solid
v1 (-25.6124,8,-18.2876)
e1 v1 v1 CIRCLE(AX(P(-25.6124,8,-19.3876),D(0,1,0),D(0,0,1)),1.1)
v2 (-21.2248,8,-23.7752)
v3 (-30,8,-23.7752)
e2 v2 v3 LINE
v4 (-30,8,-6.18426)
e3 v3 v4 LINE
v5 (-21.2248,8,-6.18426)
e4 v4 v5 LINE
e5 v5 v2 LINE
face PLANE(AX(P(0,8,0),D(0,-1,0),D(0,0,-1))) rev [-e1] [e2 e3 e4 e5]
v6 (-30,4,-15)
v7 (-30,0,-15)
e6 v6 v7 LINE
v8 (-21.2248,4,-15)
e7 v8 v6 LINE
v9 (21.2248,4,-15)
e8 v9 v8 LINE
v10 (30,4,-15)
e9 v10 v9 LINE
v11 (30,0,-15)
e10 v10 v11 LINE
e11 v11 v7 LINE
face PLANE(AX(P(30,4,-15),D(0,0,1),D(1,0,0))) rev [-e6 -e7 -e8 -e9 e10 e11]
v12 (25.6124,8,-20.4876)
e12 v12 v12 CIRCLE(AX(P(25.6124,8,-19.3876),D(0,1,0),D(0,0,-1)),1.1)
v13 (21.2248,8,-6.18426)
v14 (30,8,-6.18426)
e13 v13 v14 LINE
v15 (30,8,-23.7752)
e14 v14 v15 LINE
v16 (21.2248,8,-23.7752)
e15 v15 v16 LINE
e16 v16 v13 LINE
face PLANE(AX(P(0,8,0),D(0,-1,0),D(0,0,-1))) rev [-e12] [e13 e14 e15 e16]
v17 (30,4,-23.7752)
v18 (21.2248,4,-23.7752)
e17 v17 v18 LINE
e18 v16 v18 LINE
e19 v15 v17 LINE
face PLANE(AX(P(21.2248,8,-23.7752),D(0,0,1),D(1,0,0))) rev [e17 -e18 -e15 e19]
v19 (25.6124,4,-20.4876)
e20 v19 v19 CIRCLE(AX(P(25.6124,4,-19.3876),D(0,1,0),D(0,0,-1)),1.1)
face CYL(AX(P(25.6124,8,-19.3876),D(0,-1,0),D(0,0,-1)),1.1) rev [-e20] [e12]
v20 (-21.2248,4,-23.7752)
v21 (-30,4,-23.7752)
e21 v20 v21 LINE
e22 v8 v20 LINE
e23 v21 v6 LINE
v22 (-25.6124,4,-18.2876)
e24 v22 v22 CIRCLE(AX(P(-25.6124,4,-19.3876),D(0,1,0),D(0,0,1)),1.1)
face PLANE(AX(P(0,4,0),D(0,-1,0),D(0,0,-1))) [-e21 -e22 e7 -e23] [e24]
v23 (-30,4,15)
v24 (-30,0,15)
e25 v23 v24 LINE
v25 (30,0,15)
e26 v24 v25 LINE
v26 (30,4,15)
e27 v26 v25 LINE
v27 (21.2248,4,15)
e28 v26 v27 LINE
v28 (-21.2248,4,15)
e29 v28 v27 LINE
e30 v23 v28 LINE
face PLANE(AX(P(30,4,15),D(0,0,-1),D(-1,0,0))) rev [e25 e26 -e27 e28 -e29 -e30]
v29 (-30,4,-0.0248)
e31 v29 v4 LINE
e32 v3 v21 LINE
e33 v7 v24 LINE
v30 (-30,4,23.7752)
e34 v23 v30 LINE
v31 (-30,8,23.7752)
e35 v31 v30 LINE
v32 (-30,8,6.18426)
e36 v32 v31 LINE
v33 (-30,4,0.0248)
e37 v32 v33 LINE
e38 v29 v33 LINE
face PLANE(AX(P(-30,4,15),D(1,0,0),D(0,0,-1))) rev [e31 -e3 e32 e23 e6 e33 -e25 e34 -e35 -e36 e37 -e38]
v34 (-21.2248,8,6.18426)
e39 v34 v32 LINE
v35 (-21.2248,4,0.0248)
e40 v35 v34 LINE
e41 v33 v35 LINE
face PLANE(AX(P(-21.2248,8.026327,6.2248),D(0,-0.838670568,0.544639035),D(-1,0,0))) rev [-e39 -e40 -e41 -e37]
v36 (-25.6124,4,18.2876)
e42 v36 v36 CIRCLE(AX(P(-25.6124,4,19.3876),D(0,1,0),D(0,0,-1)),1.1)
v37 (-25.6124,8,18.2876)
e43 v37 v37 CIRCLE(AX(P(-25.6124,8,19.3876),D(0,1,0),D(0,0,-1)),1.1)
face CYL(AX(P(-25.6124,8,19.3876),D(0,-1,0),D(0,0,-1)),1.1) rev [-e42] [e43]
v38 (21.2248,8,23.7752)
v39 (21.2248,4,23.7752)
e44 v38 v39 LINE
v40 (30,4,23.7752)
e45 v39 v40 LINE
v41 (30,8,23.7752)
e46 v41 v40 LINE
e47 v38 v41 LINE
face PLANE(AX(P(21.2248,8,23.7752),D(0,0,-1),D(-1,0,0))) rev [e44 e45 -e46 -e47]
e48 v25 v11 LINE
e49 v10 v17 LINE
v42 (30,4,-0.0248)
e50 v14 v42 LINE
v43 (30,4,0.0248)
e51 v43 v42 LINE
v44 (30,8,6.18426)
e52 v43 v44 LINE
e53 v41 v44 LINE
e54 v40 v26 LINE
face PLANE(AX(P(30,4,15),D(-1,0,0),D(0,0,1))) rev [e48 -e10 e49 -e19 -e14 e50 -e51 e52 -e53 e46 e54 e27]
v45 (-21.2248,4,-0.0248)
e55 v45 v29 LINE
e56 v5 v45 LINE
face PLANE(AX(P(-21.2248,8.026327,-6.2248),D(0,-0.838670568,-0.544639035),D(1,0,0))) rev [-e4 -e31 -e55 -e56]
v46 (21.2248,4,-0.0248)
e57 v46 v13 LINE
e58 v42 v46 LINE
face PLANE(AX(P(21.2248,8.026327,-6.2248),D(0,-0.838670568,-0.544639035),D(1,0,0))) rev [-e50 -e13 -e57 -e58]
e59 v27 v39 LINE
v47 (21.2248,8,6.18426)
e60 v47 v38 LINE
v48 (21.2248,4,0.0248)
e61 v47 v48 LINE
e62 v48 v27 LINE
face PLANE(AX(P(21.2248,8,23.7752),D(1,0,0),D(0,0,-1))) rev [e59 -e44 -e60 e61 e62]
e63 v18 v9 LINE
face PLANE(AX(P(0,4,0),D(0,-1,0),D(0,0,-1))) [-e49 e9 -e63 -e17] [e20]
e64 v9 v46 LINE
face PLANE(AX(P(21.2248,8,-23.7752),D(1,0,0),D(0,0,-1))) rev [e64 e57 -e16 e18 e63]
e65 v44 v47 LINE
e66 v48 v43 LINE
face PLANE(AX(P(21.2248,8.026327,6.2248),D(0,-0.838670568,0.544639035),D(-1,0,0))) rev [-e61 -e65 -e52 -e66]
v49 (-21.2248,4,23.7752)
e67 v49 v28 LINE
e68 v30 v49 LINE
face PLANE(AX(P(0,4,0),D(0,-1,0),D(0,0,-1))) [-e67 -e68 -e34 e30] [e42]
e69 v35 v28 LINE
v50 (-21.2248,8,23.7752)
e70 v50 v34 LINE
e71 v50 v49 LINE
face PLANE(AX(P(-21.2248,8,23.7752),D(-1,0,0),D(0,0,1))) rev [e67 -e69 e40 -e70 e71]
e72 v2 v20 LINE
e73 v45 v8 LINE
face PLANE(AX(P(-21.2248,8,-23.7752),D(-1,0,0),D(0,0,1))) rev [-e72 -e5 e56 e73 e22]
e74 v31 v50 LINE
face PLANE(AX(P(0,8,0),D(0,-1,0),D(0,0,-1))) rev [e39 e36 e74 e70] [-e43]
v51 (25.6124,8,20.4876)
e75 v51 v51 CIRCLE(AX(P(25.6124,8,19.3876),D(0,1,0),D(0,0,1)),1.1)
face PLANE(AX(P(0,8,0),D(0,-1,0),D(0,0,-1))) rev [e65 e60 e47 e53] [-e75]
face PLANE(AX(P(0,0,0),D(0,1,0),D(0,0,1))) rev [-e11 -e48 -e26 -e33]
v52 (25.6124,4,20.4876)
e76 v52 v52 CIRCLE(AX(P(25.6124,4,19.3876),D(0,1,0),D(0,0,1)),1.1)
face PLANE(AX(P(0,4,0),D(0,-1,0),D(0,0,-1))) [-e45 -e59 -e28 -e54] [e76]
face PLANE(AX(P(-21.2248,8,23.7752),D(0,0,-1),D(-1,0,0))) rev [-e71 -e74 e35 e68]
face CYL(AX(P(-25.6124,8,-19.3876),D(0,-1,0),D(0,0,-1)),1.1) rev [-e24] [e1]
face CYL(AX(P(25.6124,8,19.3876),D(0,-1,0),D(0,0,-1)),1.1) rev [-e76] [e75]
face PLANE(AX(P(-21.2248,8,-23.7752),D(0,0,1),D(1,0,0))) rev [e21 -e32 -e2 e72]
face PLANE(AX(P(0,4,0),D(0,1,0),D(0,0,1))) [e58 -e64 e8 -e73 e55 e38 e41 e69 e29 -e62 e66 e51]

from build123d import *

# Parameters (mm, degrees)
SKETCH1_W           = 60
SKETCH1_H           = 30
BOSS_EXTRUDE1_DEPTH = 4
SKETCH2_W           = 8.7752
SKETCH2_H           = 17.5504
SKETCH2_R           = 1.1
BOSS_EXTRUDE2_DEPTH = 4
CHAMFER1_SIZE       = 6.2
CHAMFER1_SIZE_2     = 4.026327078


with BuildPart() as part:
    # Sketch1 → Boss-Extrude1 (new body)
    with BuildSketch(Plane(origin=(0, 0, 0), x_dir=(1, 0, 0), z_dir=(0, 1, 0))):
        Rectangle(SKETCH1_W, SKETCH1_H)
    extrude(amount=BOSS_EXTRUDE1_DEPTH)

    # Sketch2 → Boss-Extrude2 (add)
    # profile 1 of 4: a face of its own
    with BuildSketch(Plane(origin=(0, 4, 0), x_dir=(1, 0, 0), z_dir=(0, 1, 0))):
        with Locations((-25.6124, 15)):
            Rectangle(SKETCH2_W, SKETCH2_H)
        with Locations(Location((-25.6124, 19.3876, 0), (0, 0, 270))):
            Circle(SKETCH2_R, mode=Mode.SUBTRACT)
    # profile 2 of 4: a face of its own
    with BuildSketch(Plane(origin=(0, 4, 0), x_dir=(1, 0, 0), z_dir=(0, 1, 0))):
        with Locations((-25.6124, -15)):
            Rectangle(SKETCH2_W, SKETCH2_H)
        with Locations(Location((-25.6124, -19.3876, 0), (0, 0, 90))):
            Circle(SKETCH2_R, mode=Mode.SUBTRACT)
    # profile 3 of 4: a face of its own
    with BuildSketch(Plane(origin=(0, 4, 0), x_dir=(1, 0, 0), z_dir=(0, 1, 0))):
        with Locations((25.6124, -15)):
            Rectangle(SKETCH2_W, SKETCH2_H)
        with Locations(Location((25.6124, -19.3876, 0), (0, 0, 270))):
            Circle(SKETCH2_R, mode=Mode.SUBTRACT)
    # profile 4 of 4: a face of its own
    with BuildSketch(Plane(origin=(0, 4, 0), x_dir=(1, 0, 0), z_dir=(0, 1, 0))):
        with Locations((25.6124, 15)):
            Rectangle(SKETCH2_W, SKETCH2_H)
        with Locations(Location((25.6124, 19.3876, 0), (0, 0, 90))):
            Circle(SKETCH2_R, mode=Mode.SUBTRACT)
    extrude(amount=BOSS_EXTRUDE2_DEPTH)

    # Chamfer1
    # the kernel refuses this chamfer: 6.2, 4.026327078 mm, written as the material it adds along each edge
    with BuildSketch(Plane(origin=(30, 4, -6.2248), x_dir=(0, -0.021073765466273358, 0.9997779235455605), z_dir=(-1, 0, 0))) as chamfer1_piece_1_section:
        Polygon((CHAMFER1_SIZE * 0.999777923546, CHAMFER1_SIZE * 0.0210737654663), (-CHAMFER1_SIZE_2 * 0.0210737654654, CHAMFER1_SIZE_2 * 0.999777923502), (0, 0), align=None)
    chamfer1_piece_1 = extrude(amount=8.7752, mode=Mode.PRIVATE)
    chamfer1_piece_1 = split(chamfer1_piece_1, bisect_by=Plane(origin=(25.6124, 8, -4.147892519), z_dir=(0, -1, 0)), keep=Keep.TOP, mode=Mode.PRIVATE)
    add(chamfer1_piece_1)
    with BuildSketch(Plane(origin=(30, 4, 6.2248), x_dir=(0, -0.021073765466273358, -0.9997779235455605), z_dir=(-1, 0, 0))) as chamfer1_piece_2_section:
        Polygon((CHAMFER1_SIZE * 0.999777923546, -CHAMFER1_SIZE * 0.0210737654663), (-CHAMFER1_SIZE_2 * 0.0210737654654, -CHAMFER1_SIZE_2 * 0.999777923502), (0, 0), align=None)
    chamfer1_piece_2 = extrude(amount=8.7752, mode=Mode.PRIVATE)
    chamfer1_piece_2 = split(chamfer1_piece_2, bisect_by=Plane(origin=(25.6124, 8, 4.147892519), z_dir=(0, -1, 0)), keep=Keep.TOP, mode=Mode.PRIVATE)
    add(chamfer1_piece_2)
    with BuildSketch(Plane(origin=(-30, 4, 6.2248), x_dir=(0, -0.021073765466273358, -0.9997779235455605), z_dir=(1, 0, 0))) as chamfer1_piece_3_section:
        Polygon((CHAMFER1_SIZE * 0.999777923546, CHAMFER1_SIZE * 0.0210737654663), (-CHAMFER1_SIZE_2 * 0.0210737654654, CHAMFER1_SIZE_2 * 0.999777923502), (0, 0), align=None)
    chamfer1_piece_3 = extrude(amount=8.7752, mode=Mode.PRIVATE)
    chamfer1_piece_3 = split(chamfer1_piece_3, bisect_by=Plane(origin=(-25.6124, 8, 4.147892519), z_dir=(0, -1, 0)), keep=Keep.TOP, mode=Mode.PRIVATE)
    add(chamfer1_piece_3)
    with BuildSketch(Plane(origin=(-30, 4, -6.2248), x_dir=(0, -0.021073765466273358, 0.9997779235455605), z_dir=(1, 0, 0))) as chamfer1_piece_4_section:
        Polygon((CHAMFER1_SIZE * 0.999777923546, -CHAMFER1_SIZE * 0.0210737654663), (-CHAMFER1_SIZE_2 * 0.0210737654654, -CHAMFER1_SIZE_2 * 0.999777923502), (0, 0), align=None)
    chamfer1_piece_4 = extrude(amount=8.7752, mode=Mode.PRIVATE)
    chamfer1_piece_4 = split(chamfer1_piece_4, bisect_by=Plane(origin=(-25.6124, 8, -4.147892519), z_dir=(0, -1, 0)), keep=Keep.TOP, mode=Mode.PRIVATE)
    add(chamfer1_piece_4)


solid = part.part
